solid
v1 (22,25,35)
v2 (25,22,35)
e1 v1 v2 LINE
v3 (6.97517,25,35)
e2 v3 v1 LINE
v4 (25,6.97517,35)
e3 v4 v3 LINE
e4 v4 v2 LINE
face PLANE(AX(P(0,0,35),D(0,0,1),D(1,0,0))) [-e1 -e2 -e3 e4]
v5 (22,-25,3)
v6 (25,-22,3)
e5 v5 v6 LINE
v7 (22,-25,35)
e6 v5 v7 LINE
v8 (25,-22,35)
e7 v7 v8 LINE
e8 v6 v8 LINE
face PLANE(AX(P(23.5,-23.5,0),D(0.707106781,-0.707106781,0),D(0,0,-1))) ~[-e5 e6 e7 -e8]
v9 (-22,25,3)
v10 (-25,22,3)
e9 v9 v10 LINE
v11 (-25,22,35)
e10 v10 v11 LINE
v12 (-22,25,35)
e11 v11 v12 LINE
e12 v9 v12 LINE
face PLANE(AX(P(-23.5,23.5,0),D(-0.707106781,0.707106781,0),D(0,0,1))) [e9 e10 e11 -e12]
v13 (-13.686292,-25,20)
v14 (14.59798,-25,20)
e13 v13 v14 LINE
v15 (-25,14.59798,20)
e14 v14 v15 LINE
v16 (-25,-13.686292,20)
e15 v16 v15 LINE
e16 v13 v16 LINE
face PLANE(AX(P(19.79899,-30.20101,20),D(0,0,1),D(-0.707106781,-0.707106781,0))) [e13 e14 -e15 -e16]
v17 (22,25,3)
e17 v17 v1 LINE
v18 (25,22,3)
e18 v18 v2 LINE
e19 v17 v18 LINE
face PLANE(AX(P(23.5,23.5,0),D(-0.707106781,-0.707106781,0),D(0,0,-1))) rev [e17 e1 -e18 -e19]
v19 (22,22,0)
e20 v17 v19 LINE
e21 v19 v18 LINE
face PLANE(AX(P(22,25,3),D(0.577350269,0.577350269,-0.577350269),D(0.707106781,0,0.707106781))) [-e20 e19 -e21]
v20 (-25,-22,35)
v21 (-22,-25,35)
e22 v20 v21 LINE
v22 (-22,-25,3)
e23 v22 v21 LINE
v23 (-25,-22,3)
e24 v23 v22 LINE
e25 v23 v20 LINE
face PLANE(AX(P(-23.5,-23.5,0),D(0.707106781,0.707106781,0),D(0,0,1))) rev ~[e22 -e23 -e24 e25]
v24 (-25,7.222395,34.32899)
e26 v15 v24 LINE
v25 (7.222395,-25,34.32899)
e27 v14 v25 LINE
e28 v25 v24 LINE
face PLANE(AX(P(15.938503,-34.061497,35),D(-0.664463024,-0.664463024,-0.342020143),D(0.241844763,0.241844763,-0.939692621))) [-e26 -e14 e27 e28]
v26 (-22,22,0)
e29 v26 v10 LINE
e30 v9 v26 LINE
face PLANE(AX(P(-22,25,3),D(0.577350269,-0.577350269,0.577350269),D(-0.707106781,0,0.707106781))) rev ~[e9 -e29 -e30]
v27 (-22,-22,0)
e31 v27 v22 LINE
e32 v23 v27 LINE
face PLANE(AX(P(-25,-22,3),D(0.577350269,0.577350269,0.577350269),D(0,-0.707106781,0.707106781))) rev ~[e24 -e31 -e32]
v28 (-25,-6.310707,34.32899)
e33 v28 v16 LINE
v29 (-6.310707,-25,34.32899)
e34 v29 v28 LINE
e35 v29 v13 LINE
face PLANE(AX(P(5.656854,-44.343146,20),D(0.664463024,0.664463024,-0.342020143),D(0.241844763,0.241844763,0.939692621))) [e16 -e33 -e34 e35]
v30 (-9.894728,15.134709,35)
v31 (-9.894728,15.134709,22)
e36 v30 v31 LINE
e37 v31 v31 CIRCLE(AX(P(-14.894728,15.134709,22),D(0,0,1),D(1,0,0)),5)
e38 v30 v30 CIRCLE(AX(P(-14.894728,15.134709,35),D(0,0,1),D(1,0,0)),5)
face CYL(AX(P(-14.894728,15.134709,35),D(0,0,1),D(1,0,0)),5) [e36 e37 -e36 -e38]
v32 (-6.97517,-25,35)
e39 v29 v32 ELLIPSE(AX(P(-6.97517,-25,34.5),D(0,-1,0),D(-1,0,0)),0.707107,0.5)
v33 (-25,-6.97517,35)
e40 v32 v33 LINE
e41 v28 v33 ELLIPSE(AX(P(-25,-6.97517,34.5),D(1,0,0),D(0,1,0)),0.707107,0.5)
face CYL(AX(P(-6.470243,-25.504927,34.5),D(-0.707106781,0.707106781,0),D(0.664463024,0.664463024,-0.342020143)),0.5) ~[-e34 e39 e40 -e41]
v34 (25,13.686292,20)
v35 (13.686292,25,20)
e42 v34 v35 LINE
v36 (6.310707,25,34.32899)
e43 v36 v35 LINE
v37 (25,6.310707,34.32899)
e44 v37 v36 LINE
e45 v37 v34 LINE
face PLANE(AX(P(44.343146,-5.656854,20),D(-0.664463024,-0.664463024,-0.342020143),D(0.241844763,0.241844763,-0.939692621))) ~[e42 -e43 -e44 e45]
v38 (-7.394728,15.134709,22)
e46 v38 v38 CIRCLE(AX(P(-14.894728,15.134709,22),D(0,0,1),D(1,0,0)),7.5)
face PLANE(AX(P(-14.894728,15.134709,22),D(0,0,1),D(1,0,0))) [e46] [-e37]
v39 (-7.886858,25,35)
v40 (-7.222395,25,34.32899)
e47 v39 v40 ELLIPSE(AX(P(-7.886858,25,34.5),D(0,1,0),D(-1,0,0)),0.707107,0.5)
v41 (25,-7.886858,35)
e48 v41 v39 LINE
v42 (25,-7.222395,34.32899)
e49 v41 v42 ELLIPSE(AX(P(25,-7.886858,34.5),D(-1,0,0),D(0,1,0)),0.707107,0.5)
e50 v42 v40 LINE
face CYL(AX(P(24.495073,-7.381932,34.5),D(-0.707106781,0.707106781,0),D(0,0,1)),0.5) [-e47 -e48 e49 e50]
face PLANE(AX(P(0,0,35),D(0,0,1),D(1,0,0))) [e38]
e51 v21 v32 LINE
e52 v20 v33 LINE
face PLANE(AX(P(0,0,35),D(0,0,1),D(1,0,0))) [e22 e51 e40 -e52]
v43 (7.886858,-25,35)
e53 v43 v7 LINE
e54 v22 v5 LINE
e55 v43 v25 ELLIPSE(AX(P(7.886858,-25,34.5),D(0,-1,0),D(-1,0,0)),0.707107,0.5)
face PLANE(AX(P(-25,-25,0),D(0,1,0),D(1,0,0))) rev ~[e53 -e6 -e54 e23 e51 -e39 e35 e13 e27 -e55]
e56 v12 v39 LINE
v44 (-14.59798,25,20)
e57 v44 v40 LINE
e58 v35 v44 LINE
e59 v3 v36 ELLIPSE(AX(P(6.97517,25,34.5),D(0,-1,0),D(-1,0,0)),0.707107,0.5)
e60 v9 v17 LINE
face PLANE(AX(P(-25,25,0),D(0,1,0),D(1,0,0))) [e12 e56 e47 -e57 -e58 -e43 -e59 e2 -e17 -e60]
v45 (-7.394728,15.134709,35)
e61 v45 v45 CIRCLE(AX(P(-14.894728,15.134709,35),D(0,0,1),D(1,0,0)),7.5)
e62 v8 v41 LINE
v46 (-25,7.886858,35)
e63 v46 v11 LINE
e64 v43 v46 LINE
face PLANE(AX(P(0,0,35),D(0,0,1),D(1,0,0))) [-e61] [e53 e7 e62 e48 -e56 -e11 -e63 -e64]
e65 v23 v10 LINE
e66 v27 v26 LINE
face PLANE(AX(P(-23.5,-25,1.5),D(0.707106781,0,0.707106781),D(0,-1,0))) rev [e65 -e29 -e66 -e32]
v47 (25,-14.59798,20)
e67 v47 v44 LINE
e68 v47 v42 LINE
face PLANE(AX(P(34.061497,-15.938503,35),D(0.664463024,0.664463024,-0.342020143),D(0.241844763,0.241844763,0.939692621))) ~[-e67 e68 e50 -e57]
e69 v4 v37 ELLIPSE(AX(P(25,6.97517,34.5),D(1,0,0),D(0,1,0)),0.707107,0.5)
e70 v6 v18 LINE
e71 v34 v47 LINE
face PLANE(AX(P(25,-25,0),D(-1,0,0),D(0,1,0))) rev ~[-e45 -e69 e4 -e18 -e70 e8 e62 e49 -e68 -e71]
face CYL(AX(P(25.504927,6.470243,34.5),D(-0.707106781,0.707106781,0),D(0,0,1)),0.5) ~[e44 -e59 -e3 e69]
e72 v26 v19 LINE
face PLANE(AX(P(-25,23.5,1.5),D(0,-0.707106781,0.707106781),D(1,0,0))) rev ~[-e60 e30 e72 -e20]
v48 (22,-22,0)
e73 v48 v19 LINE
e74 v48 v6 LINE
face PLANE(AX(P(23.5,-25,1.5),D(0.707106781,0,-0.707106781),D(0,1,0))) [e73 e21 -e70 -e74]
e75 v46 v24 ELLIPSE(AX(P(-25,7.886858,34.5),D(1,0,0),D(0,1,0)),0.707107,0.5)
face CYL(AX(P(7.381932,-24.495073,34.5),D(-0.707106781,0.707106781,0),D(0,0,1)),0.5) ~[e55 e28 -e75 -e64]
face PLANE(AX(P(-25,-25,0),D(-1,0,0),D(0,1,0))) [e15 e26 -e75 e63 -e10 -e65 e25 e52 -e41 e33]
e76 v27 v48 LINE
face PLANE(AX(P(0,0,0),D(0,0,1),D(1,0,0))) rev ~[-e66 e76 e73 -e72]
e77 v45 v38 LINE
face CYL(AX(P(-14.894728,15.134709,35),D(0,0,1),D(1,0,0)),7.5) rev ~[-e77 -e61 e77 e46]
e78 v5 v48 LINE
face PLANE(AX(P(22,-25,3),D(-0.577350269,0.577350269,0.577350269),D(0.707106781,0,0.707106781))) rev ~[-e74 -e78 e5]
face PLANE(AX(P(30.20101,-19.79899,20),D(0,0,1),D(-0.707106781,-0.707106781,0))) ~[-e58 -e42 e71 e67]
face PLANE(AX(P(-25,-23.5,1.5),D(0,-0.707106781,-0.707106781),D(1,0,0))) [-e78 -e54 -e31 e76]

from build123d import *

# Parameters (mm, degrees)
F0_W     = 50
F0_H     = 50
F1_DEPTH = 35
F4_DEPTH = 74.8112648726
F6_SIZE  = 3
F7_R     = 0.5
F8_R     = 7.5
F8_R_2   = 5
F9_DEPTH = 13


# Not quite as in the source:
# - a pattern or mirror of a feature is missing from the dataset's text; its kind, count and spacing are read off the source's solid


with BuildPart() as f1:
    # F0 (on Top) → F1 (new body)
    with BuildSketch(Plane.XY):
        Rectangle(F0_W, F0_H)
    extrude(amount=F1_DEPTH)

    # F3 (on face) → F4 (cut)
    with BuildSketch(Plane(origin=(25, -25, 0), x_dir=(-0.7071067812, -0.7071067812, 0), z_dir=(-0.7071067812, 0.7071067812, 0))):
        Polygon((27.3553390593, 20), (21.8957855453, 35), (12.8148925733, 35), (7.3553390593, 20), align=None)
    f4 = extrude(amount=F4_DEPTH, mode=Mode.SUBTRACT)

    # F4_copies: F4 across plane
    add(f4.mirror(Plane(origin=(0, 0, 0), x_dir=(0.7071067812, -0.7071067812, 0), z_dir=(0.7071067812, 0.7071067812, 0))), mode=Mode.SUBTRACT)

    # F6
    f6_edges = [f1.edges().sort_by_distance(p)[0] for p in [
        (25, 0, 0),
        (0, -25, 0),
        (-25, 0, 0),
        (0, 25, 0),
        (25, -25, 17.5),
        (-25, -25, 17.5),
        (-25, 25, 17.5),
        (25, 25, 17.5),
    ]]
    chamfer(f6_edges, length=F6_SIZE)

    # F7
    f7_edges = [f1.edges().sort_by_distance(p)[0] for p in [
        (-15.482658, -15.482658, 35),
        (-9.061497, -9.061497, 35),
        (9.061497, 9.061497, 35),
        (15.482658, 15.482658, 35),
    ]]
    fillet(f7_edges, radius=F7_R)

    # F8 (on face) → F9 (cut)
    with BuildSketch(Plane.XY.offset(35)):
        with Locations((-14.8947280353, 15.1347092162)):
            Circle(F8_R)
        with Locations((-14.8947280353, 15.1347092162)):
            Circle(F8_R_2, mode=Mode.SUBTRACT)
    extrude(amount=-F9_DEPTH, mode=Mode.SUBTRACT)


solid = f1.part
